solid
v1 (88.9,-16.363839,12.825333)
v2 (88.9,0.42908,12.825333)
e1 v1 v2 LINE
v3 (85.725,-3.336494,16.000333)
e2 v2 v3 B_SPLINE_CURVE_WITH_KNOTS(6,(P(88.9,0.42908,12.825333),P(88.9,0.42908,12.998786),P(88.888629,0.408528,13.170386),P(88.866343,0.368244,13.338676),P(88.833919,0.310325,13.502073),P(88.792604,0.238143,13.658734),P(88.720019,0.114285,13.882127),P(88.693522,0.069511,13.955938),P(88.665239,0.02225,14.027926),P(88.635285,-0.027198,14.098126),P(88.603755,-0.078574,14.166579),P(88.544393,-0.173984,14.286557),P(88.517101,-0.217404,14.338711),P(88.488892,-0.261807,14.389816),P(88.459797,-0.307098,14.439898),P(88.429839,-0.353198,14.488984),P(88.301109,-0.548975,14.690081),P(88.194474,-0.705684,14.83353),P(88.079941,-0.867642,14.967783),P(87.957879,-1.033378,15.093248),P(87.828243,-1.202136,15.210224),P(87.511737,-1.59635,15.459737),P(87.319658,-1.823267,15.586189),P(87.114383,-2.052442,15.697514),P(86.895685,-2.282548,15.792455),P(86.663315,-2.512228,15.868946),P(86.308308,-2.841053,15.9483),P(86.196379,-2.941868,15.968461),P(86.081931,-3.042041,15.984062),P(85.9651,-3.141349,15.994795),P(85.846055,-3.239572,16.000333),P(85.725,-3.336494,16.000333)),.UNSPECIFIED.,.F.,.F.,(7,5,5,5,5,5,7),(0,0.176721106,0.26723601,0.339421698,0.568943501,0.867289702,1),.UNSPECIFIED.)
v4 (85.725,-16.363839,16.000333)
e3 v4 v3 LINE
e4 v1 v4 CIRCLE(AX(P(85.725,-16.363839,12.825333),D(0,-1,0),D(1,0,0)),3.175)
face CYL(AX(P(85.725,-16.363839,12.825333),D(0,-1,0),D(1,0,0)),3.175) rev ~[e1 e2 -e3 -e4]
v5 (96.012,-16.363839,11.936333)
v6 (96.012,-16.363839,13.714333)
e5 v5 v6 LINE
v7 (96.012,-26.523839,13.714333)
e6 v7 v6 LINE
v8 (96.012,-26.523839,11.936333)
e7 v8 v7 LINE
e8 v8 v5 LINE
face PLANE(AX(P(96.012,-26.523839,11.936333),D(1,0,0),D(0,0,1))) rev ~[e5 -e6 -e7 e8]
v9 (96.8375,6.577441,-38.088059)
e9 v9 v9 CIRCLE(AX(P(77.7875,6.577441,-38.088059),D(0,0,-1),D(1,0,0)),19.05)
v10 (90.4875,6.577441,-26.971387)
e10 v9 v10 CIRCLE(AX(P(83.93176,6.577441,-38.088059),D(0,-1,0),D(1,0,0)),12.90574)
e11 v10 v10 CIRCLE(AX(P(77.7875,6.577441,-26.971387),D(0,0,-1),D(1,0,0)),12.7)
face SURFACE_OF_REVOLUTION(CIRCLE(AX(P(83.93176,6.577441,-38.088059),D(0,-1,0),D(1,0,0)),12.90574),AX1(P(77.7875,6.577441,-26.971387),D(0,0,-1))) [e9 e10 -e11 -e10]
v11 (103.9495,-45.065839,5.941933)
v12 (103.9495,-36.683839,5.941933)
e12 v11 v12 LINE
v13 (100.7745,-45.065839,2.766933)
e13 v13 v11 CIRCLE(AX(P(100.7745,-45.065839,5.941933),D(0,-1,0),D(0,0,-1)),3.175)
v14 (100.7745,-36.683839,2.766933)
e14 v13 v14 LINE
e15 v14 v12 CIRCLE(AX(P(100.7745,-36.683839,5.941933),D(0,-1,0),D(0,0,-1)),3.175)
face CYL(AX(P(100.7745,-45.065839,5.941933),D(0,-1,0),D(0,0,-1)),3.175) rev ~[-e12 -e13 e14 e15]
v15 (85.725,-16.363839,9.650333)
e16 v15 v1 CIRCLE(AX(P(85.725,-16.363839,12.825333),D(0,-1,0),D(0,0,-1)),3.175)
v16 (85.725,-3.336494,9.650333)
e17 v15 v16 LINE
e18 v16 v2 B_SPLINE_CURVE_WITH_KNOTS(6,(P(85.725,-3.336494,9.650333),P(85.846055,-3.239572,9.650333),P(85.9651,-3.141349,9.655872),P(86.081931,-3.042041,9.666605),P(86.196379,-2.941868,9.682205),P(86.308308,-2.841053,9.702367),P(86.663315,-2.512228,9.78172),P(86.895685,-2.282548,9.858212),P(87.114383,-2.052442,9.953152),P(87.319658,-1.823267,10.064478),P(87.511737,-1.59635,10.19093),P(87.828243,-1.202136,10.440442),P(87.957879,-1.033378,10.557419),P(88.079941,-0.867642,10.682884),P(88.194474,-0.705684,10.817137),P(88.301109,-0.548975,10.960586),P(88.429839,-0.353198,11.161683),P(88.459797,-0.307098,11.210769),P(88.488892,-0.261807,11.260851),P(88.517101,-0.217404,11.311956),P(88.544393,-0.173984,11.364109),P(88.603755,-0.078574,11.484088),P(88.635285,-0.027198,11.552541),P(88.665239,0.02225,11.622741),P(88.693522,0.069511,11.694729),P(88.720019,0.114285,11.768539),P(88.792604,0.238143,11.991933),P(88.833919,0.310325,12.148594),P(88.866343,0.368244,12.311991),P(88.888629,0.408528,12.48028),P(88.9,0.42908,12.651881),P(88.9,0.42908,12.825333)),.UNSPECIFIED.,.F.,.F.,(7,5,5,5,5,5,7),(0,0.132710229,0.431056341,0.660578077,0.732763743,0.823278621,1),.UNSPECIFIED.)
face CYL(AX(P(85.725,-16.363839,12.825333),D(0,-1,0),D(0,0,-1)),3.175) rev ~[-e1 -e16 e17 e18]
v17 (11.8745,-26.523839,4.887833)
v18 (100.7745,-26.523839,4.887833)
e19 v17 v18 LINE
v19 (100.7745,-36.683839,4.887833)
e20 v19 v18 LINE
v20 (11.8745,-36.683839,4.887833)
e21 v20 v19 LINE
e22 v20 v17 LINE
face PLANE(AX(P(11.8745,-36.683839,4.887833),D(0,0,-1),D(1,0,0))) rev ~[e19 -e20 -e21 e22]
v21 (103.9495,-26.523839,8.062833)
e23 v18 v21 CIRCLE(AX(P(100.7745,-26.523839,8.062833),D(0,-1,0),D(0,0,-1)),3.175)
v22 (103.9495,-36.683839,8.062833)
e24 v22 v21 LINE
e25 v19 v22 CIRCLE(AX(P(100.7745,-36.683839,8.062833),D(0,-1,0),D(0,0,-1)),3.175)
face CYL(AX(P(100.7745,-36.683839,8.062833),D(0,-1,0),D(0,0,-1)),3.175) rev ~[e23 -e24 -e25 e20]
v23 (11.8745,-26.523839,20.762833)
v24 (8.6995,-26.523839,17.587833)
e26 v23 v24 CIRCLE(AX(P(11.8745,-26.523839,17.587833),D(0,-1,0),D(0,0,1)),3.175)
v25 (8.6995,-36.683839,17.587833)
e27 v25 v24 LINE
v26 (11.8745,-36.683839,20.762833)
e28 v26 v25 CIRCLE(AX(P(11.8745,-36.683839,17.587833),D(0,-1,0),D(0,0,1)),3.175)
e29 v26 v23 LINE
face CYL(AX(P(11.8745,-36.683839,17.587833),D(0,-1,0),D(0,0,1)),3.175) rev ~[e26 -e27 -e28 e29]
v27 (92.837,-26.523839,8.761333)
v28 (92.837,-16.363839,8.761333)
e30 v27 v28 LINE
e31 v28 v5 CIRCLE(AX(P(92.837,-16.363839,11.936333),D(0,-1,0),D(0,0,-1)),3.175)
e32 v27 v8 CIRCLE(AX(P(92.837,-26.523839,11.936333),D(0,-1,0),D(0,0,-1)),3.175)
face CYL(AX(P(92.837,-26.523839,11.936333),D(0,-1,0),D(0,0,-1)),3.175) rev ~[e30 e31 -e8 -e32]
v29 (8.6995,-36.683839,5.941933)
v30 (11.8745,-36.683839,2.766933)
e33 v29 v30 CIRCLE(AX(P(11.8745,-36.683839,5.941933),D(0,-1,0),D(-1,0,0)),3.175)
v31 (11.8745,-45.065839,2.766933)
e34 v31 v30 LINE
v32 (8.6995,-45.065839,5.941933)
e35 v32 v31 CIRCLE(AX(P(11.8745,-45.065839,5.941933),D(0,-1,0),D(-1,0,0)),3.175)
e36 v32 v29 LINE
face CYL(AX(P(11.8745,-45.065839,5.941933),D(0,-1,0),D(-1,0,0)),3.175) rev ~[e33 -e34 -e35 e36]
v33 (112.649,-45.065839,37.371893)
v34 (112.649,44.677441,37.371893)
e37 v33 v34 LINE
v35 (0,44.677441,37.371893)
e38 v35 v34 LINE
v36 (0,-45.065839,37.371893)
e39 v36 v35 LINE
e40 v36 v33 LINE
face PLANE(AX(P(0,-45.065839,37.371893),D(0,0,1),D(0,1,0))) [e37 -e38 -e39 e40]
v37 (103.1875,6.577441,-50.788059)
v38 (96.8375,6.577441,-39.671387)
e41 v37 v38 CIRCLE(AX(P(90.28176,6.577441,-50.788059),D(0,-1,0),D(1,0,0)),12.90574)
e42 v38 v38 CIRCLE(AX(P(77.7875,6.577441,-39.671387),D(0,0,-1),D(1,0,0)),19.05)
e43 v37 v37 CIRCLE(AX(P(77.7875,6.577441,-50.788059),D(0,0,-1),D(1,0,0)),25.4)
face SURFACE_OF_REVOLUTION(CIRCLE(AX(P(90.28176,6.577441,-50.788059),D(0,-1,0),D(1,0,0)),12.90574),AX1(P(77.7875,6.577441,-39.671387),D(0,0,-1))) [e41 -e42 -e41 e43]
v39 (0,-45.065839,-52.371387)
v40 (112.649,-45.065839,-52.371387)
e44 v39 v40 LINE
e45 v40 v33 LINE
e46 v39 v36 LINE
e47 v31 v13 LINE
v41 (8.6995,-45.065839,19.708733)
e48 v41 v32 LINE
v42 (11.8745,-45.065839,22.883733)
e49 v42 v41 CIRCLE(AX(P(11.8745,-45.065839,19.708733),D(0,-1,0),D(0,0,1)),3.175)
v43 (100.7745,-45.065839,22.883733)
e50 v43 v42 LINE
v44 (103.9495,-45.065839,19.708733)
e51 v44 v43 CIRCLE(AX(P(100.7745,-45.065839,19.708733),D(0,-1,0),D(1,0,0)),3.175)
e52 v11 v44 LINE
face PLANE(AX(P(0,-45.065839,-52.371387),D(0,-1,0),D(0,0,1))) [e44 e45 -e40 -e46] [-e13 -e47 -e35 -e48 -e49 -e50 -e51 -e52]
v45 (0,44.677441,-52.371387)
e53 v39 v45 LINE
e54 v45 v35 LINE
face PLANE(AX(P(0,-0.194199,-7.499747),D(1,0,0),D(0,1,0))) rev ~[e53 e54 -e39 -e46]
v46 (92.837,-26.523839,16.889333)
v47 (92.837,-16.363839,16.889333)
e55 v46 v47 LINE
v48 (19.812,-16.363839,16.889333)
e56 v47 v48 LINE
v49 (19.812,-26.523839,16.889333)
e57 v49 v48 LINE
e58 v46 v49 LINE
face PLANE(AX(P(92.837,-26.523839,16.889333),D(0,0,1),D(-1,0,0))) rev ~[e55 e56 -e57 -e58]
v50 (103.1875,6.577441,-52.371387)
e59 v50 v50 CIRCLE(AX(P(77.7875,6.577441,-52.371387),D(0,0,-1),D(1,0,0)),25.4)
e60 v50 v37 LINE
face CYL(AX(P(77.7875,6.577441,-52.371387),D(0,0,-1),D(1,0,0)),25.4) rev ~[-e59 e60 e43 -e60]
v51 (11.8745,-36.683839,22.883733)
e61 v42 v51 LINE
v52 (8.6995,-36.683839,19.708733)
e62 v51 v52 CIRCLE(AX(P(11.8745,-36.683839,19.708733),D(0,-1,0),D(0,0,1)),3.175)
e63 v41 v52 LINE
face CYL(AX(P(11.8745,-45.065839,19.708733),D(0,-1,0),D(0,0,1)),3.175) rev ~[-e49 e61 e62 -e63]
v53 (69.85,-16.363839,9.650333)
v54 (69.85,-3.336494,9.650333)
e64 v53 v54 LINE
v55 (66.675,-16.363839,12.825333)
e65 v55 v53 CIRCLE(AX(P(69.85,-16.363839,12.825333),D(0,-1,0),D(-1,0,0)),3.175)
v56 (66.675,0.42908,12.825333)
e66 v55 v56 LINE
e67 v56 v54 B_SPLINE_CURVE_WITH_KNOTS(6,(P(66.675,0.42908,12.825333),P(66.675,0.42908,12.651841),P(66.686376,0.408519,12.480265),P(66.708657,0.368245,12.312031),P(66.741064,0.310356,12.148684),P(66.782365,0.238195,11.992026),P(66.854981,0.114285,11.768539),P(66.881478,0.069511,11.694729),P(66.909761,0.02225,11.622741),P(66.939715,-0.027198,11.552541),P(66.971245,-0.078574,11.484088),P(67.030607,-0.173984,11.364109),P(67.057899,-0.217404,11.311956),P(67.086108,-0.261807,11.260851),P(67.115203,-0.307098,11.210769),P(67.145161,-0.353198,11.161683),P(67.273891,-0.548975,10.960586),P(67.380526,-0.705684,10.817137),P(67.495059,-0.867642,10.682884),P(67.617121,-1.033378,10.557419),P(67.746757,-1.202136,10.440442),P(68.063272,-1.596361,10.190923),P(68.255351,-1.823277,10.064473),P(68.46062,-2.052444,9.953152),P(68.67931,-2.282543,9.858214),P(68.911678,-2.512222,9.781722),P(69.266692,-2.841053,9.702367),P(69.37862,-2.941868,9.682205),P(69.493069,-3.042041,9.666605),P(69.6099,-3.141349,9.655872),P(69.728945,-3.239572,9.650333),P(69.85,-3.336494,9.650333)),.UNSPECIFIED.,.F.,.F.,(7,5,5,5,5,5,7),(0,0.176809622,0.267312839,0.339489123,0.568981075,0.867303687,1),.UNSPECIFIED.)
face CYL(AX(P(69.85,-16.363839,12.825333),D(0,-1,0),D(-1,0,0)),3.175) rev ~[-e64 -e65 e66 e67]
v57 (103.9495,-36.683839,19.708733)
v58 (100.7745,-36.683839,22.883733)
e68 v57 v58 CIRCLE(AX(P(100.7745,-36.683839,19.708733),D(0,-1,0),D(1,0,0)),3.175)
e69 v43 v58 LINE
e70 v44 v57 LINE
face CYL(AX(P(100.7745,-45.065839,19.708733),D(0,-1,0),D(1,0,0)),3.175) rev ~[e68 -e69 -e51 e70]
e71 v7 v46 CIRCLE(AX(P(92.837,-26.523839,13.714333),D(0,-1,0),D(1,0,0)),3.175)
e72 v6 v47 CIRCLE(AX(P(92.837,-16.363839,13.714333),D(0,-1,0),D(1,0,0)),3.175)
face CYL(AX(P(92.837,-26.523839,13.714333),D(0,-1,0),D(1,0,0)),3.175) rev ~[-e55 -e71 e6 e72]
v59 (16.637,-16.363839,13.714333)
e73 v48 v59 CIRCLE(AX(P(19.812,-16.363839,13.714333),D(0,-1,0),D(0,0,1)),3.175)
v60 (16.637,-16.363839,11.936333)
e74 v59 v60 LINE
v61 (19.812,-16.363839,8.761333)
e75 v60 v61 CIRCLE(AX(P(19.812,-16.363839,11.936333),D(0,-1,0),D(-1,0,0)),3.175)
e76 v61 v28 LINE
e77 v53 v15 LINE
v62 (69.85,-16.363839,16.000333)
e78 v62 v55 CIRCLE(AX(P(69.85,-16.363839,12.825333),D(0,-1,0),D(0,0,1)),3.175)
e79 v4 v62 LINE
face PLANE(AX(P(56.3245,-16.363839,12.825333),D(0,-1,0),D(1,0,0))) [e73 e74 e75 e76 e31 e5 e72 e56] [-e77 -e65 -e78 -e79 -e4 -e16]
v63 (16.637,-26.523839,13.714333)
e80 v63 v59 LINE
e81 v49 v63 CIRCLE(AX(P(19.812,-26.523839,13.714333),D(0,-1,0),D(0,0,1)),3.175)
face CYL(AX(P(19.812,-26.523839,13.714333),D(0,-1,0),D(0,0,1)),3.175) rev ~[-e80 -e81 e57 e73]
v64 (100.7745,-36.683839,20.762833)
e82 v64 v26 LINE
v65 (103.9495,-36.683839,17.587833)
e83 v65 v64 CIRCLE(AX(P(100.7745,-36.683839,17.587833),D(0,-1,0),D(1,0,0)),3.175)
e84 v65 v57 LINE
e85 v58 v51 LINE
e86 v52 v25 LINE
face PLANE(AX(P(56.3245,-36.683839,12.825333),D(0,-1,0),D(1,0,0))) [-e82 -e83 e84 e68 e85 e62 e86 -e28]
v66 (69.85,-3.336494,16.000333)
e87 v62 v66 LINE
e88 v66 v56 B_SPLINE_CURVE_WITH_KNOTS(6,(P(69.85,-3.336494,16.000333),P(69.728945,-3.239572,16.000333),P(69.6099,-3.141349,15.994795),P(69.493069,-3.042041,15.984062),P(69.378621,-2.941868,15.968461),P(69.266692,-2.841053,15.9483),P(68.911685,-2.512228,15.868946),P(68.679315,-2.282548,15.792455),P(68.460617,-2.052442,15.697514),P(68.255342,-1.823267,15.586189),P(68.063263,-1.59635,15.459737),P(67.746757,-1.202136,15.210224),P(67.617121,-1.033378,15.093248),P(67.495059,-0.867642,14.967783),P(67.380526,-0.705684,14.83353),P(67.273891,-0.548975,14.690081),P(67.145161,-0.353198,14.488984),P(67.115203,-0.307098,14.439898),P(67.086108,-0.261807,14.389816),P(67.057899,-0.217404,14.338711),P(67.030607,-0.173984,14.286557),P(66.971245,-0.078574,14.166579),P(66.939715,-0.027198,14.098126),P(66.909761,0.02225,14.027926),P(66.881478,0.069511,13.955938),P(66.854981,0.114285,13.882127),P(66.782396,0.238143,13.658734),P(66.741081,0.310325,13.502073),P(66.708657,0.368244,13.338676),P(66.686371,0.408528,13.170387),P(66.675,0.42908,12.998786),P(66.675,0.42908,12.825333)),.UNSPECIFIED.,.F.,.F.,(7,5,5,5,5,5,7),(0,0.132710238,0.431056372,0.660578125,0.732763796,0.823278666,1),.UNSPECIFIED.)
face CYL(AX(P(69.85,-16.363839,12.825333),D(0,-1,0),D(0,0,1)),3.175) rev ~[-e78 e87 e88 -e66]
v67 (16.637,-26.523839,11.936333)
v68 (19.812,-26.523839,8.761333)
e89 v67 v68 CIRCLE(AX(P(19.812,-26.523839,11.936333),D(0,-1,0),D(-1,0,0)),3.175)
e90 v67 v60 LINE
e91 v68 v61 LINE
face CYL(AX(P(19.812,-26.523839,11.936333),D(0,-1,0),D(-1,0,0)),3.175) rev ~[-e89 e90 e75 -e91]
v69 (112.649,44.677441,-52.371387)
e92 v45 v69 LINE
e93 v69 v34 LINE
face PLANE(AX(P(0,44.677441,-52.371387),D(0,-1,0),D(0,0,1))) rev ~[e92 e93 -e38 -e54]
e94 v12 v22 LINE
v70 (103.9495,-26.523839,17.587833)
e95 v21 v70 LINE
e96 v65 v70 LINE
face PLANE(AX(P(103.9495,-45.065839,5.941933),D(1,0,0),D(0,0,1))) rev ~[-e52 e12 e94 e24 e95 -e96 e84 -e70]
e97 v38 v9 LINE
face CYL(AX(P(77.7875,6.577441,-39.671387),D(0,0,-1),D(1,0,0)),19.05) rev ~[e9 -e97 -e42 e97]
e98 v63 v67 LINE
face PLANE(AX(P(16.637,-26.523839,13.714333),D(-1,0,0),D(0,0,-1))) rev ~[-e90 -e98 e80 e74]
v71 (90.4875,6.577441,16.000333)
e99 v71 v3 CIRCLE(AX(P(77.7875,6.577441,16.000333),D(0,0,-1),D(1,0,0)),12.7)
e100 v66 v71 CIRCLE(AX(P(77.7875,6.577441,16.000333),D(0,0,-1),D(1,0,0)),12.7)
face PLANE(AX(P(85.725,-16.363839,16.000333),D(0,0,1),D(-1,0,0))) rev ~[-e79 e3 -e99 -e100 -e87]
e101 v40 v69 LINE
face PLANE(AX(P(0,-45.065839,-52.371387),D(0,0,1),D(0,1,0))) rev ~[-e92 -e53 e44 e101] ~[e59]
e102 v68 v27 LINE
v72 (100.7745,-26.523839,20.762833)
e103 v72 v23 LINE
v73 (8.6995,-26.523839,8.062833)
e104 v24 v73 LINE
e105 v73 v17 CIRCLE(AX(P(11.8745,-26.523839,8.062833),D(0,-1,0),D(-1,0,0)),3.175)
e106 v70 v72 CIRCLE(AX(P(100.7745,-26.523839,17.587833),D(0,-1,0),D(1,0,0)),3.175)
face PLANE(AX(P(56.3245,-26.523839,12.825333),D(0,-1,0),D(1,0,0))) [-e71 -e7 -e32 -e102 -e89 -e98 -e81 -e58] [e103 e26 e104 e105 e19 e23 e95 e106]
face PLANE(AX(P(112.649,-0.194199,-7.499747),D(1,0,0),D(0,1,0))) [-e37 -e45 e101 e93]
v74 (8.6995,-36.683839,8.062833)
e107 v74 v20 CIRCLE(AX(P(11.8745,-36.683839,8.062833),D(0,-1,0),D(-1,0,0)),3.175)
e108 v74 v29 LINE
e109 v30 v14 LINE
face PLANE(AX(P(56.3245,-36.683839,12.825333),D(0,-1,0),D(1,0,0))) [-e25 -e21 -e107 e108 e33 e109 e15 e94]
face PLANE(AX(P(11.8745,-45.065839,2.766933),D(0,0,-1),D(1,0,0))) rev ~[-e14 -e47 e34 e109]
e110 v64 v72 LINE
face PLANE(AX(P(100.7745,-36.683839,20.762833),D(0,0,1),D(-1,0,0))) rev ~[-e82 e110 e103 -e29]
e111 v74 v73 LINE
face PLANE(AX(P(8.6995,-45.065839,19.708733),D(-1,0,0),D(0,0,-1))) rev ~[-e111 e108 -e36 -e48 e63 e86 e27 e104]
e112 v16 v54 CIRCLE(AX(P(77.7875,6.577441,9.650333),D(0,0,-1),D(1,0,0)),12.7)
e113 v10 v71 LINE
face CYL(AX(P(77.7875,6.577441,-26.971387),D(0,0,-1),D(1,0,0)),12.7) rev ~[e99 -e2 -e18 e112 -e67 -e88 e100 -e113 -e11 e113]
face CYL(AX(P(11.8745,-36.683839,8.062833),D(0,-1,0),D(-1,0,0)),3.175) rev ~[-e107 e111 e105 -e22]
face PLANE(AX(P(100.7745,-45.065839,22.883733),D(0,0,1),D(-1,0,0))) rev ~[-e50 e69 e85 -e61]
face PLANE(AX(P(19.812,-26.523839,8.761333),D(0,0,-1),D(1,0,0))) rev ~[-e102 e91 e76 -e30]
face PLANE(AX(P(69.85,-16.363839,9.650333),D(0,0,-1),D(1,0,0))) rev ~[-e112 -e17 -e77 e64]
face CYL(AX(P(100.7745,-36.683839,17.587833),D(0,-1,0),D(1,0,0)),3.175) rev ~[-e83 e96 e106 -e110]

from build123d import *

# Parameters (mm, degrees)
F0_W      = 89.74328
F0_H      = 89.74328
F1_DEPTH  = 112.649
F3_DEPTH  = 8.382
F5_DEPTH  = 10.16
F7_DEPTH  = 10.16
F9_DEPTH  = 25.4
F10_R     = 25.4
F11_DEPTH = 12.7
F12_R     = 19.05
F13_DEPTH = 12.7
F14_R     = 12.7
F15_DEPTH = 42.97172


# Not quite as in the source:
# - a fillet or chamfer that OpenCascade refuses, or shapes differently, is made with other operations: its cross-section is extruded or revolved along the edge and cut away or added


with BuildPart() as f1:
    # F0 (on Right) → F1 (new body)
    with BuildSketch(Plane.YZ):
        with Locations((-0.1941993833, -7.4997466138)):
            Rectangle(F0_W, F0_H)
    extrude(amount=F1_DEPTH)

    # F2 (on face) → F3 (cut)
    with BuildSketch(Plane.XZ.offset(45.0658393833)):
        with BuildLine():
            ThreePointArc((103.9495, 19.7087333862), (103.0195640303, 21.9537974165), (100.7745, 22.8837333862))
            Line((100.7745, 22.8837333862), (11.8745, 22.8837333862))
            ThreePointArc((11.8745, 22.8837333862), (9.6294359697, 21.9537974165), (8.6995, 19.7087333862))
            Line((8.6995, 19.7087333862), (8.6995, 5.9419333862))
            ThreePointArc((8.6995, 5.9419333862), (9.6294359697, 3.6968693559), (11.8745, 2.7669333862))
            Line((11.8745, 2.7669333862), (100.7745, 2.7669333862))
            ThreePointArc((100.7745, 2.7669333862), (103.0195640303, 3.6968693559), (103.9495, 5.9419333862))
            Line((103.9495, 5.9419333862), (103.9495, 19.7087333862))
        make_face()
    extrude(amount=-F3_DEPTH, mode=Mode.SUBTRACT)

    # F4 (on face) → F5 (cut)
    with BuildSketch(Plane.XZ.offset(36.6838393833)):
        with BuildLine():
            ThreePointArc((8.6995, 8.0628333862), (9.6294359697, 5.8177693559), (11.8745, 4.8878333862))
            Line((11.8745, 4.8878333862), (100.7745, 4.8878333862))
            ThreePointArc((100.7745, 4.8878333862), (103.0195640303, 5.8177693559), (103.9495, 8.0628333862))
            Line((103.9495, 8.0628333862), (103.9495, 17.5878333862))
            ThreePointArc((103.9495, 17.5878333862), (103.0195640303, 19.8328974165), (100.7745, 20.7628333862))
            Line((100.7745, 20.7628333862), (11.8745, 20.7628333862))
            ThreePointArc((11.8745, 20.7628333862), (9.6294359697, 19.8328974165), (8.6995, 17.5878333862))
            Line((8.6995, 17.5878333862), (8.6995, 8.0628333862))
        make_face()
    extrude(amount=-F5_DEPTH, mode=Mode.SUBTRACT)

    # F6 (on face) → F7 (cut)
    with BuildSketch(Plane.XZ.offset(26.5238393833)):
        with BuildLine():
            ThreePointArc((16.637, 11.9363333862), (17.5669359697, 9.6912693559), (19.812, 8.7613333862))
            Line((19.812, 8.7613333862), (92.837, 8.7613333862))
            ThreePointArc((92.837, 8.7613333862), (95.0820640303, 9.6912693559), (96.012, 11.9363333862))
            Line((96.012, 11.9363333862), (96.012, 13.7143333862))
            ThreePointArc((96.012, 13.7143333862), (95.0820640303, 15.9593974165), (92.837, 16.8893333862))
            Line((92.837, 16.8893333862), (19.812, 16.8893333862))
            ThreePointArc((19.812, 16.8893333862), (17.5669359697, 15.9593974165), (16.637, 13.7143333862))
            Line((16.637, 13.7143333862), (16.637, 11.9363333862))
        make_face()
    extrude(amount=-F7_DEPTH, mode=Mode.SUBTRACT)

    # F8 (on face) → F9 (cut)
    with BuildSketch(Plane.XZ.offset(16.3638393833)):
        with BuildLine():
            ThreePointArc((88.9, 12.8253333862), (87.9700640303, 15.0703974165), (85.725, 16.0003333862))
            Line((85.725, 16.0003333862), (69.85, 16.0003333862))
            ThreePointArc((69.85, 16.0003333862), (67.6049359697, 15.0703974165), (66.675, 12.8253333862))
            ThreePointArc((66.675, 12.8253333862), (67.6049359697, 10.5802693559), (69.85, 9.6503333862))
            Line((69.85, 9.6503333862), (85.725, 9.6503333862))
            ThreePointArc((85.725, 9.6503333862), (87.9700640303, 10.5802693559), (88.9, 12.8253333862))
        make_face()
    extrude(amount=-F9_DEPTH, mode=Mode.SUBTRACT)

    # F10 (on face) → F11 (cut)
    with BuildSketch(Plane(origin=(0, 0, -52.3713866138), x_dir=(1, 0, 0), z_dir=(0, 0, -1))):
        with Locations((77.7875, -6.5774406167)):
            Circle(F10_R)
    extrude(amount=-F11_DEPTH, mode=Mode.SUBTRACT)

    # F12 (on face) → F13 (cut)
    with BuildSketch(Plane(origin=(0, 0, -39.6713866138), x_dir=(1, 0, 0), z_dir=(0, 0, -1))):
        with Locations((77.7875, -6.5774406167)):
            Circle(F12_R)
    extrude(amount=-F13_DEPTH, mode=Mode.SUBTRACT)

    # F14 (on face) → F15 (cut)
    with BuildSketch(Plane(origin=(0, 0, -26.9713866138), x_dir=(1, 0, 0), z_dir=(0, 0, -1))):
        with Locations((77.7875, -6.5774406167)):
            Circle(F14_R)
    extrude(amount=-F15_DEPTH, mode=Mode.SUBTRACT)

    # F16: fillet of radius 12.90574 on 2 edges, made by hand

    # F16_s1 → F16_t2 (revolve)
    with BuildSketch(Plane.XZ.offset(-6.5774406167)):
        with BuildLine():
            ThreePointArc((103.1875, -50.7880586878), (101.4881153597, -44.3868303291), (96.8375, -39.6713866138))
            Line((96.8375, -39.6713866138), (96.9686148, -39.4490531723))
            ThreePointArc((96.9686148, -39.4490531723), (100.0125, -39.4132718138), (103.1875, -39.4132718138))
            Line((103.1875, -39.4132718138), (103.4456148, -39.6713866138))
            Line((103.4456148, -39.6713866138), (103.4456148, -50.7880586878))
            Line((103.4456148, -50.7880586878), (103.1875, -50.7880586878))
        make_face()
    revolve(axis=Axis((77.7875, 6.5774406167, -39.6713866138), (0, 0, -1)))

    # F16_s3 → F16_t4 (revolve)
    with BuildSketch(Plane.XZ.offset(-6.5774406167)):
        with BuildLine():
            ThreePointArc((96.8375, -38.0880586878), (95.1381153597, -31.6868303291), (90.4875, -26.9713866138))
            Line((90.4875, -26.9713866138), (90.6186148, -26.7490531723))
            ThreePointArc((90.6186148, -26.7490531723), (93.6625, -26.7132718138), (96.8375, -26.7132718138))
            Line((96.8375, -26.7132718138), (97.0956148, -26.9713866138))
            Line((97.0956148, -26.9713866138), (97.0956148, -38.0880586878))
            Line((97.0956148, -38.0880586878), (96.8375, -38.0880586878))
        make_face()
    revolve(axis=Axis((77.7875, 6.5774406167, -26.9713866138), (0, 0, -1)))


solid = f1.part
